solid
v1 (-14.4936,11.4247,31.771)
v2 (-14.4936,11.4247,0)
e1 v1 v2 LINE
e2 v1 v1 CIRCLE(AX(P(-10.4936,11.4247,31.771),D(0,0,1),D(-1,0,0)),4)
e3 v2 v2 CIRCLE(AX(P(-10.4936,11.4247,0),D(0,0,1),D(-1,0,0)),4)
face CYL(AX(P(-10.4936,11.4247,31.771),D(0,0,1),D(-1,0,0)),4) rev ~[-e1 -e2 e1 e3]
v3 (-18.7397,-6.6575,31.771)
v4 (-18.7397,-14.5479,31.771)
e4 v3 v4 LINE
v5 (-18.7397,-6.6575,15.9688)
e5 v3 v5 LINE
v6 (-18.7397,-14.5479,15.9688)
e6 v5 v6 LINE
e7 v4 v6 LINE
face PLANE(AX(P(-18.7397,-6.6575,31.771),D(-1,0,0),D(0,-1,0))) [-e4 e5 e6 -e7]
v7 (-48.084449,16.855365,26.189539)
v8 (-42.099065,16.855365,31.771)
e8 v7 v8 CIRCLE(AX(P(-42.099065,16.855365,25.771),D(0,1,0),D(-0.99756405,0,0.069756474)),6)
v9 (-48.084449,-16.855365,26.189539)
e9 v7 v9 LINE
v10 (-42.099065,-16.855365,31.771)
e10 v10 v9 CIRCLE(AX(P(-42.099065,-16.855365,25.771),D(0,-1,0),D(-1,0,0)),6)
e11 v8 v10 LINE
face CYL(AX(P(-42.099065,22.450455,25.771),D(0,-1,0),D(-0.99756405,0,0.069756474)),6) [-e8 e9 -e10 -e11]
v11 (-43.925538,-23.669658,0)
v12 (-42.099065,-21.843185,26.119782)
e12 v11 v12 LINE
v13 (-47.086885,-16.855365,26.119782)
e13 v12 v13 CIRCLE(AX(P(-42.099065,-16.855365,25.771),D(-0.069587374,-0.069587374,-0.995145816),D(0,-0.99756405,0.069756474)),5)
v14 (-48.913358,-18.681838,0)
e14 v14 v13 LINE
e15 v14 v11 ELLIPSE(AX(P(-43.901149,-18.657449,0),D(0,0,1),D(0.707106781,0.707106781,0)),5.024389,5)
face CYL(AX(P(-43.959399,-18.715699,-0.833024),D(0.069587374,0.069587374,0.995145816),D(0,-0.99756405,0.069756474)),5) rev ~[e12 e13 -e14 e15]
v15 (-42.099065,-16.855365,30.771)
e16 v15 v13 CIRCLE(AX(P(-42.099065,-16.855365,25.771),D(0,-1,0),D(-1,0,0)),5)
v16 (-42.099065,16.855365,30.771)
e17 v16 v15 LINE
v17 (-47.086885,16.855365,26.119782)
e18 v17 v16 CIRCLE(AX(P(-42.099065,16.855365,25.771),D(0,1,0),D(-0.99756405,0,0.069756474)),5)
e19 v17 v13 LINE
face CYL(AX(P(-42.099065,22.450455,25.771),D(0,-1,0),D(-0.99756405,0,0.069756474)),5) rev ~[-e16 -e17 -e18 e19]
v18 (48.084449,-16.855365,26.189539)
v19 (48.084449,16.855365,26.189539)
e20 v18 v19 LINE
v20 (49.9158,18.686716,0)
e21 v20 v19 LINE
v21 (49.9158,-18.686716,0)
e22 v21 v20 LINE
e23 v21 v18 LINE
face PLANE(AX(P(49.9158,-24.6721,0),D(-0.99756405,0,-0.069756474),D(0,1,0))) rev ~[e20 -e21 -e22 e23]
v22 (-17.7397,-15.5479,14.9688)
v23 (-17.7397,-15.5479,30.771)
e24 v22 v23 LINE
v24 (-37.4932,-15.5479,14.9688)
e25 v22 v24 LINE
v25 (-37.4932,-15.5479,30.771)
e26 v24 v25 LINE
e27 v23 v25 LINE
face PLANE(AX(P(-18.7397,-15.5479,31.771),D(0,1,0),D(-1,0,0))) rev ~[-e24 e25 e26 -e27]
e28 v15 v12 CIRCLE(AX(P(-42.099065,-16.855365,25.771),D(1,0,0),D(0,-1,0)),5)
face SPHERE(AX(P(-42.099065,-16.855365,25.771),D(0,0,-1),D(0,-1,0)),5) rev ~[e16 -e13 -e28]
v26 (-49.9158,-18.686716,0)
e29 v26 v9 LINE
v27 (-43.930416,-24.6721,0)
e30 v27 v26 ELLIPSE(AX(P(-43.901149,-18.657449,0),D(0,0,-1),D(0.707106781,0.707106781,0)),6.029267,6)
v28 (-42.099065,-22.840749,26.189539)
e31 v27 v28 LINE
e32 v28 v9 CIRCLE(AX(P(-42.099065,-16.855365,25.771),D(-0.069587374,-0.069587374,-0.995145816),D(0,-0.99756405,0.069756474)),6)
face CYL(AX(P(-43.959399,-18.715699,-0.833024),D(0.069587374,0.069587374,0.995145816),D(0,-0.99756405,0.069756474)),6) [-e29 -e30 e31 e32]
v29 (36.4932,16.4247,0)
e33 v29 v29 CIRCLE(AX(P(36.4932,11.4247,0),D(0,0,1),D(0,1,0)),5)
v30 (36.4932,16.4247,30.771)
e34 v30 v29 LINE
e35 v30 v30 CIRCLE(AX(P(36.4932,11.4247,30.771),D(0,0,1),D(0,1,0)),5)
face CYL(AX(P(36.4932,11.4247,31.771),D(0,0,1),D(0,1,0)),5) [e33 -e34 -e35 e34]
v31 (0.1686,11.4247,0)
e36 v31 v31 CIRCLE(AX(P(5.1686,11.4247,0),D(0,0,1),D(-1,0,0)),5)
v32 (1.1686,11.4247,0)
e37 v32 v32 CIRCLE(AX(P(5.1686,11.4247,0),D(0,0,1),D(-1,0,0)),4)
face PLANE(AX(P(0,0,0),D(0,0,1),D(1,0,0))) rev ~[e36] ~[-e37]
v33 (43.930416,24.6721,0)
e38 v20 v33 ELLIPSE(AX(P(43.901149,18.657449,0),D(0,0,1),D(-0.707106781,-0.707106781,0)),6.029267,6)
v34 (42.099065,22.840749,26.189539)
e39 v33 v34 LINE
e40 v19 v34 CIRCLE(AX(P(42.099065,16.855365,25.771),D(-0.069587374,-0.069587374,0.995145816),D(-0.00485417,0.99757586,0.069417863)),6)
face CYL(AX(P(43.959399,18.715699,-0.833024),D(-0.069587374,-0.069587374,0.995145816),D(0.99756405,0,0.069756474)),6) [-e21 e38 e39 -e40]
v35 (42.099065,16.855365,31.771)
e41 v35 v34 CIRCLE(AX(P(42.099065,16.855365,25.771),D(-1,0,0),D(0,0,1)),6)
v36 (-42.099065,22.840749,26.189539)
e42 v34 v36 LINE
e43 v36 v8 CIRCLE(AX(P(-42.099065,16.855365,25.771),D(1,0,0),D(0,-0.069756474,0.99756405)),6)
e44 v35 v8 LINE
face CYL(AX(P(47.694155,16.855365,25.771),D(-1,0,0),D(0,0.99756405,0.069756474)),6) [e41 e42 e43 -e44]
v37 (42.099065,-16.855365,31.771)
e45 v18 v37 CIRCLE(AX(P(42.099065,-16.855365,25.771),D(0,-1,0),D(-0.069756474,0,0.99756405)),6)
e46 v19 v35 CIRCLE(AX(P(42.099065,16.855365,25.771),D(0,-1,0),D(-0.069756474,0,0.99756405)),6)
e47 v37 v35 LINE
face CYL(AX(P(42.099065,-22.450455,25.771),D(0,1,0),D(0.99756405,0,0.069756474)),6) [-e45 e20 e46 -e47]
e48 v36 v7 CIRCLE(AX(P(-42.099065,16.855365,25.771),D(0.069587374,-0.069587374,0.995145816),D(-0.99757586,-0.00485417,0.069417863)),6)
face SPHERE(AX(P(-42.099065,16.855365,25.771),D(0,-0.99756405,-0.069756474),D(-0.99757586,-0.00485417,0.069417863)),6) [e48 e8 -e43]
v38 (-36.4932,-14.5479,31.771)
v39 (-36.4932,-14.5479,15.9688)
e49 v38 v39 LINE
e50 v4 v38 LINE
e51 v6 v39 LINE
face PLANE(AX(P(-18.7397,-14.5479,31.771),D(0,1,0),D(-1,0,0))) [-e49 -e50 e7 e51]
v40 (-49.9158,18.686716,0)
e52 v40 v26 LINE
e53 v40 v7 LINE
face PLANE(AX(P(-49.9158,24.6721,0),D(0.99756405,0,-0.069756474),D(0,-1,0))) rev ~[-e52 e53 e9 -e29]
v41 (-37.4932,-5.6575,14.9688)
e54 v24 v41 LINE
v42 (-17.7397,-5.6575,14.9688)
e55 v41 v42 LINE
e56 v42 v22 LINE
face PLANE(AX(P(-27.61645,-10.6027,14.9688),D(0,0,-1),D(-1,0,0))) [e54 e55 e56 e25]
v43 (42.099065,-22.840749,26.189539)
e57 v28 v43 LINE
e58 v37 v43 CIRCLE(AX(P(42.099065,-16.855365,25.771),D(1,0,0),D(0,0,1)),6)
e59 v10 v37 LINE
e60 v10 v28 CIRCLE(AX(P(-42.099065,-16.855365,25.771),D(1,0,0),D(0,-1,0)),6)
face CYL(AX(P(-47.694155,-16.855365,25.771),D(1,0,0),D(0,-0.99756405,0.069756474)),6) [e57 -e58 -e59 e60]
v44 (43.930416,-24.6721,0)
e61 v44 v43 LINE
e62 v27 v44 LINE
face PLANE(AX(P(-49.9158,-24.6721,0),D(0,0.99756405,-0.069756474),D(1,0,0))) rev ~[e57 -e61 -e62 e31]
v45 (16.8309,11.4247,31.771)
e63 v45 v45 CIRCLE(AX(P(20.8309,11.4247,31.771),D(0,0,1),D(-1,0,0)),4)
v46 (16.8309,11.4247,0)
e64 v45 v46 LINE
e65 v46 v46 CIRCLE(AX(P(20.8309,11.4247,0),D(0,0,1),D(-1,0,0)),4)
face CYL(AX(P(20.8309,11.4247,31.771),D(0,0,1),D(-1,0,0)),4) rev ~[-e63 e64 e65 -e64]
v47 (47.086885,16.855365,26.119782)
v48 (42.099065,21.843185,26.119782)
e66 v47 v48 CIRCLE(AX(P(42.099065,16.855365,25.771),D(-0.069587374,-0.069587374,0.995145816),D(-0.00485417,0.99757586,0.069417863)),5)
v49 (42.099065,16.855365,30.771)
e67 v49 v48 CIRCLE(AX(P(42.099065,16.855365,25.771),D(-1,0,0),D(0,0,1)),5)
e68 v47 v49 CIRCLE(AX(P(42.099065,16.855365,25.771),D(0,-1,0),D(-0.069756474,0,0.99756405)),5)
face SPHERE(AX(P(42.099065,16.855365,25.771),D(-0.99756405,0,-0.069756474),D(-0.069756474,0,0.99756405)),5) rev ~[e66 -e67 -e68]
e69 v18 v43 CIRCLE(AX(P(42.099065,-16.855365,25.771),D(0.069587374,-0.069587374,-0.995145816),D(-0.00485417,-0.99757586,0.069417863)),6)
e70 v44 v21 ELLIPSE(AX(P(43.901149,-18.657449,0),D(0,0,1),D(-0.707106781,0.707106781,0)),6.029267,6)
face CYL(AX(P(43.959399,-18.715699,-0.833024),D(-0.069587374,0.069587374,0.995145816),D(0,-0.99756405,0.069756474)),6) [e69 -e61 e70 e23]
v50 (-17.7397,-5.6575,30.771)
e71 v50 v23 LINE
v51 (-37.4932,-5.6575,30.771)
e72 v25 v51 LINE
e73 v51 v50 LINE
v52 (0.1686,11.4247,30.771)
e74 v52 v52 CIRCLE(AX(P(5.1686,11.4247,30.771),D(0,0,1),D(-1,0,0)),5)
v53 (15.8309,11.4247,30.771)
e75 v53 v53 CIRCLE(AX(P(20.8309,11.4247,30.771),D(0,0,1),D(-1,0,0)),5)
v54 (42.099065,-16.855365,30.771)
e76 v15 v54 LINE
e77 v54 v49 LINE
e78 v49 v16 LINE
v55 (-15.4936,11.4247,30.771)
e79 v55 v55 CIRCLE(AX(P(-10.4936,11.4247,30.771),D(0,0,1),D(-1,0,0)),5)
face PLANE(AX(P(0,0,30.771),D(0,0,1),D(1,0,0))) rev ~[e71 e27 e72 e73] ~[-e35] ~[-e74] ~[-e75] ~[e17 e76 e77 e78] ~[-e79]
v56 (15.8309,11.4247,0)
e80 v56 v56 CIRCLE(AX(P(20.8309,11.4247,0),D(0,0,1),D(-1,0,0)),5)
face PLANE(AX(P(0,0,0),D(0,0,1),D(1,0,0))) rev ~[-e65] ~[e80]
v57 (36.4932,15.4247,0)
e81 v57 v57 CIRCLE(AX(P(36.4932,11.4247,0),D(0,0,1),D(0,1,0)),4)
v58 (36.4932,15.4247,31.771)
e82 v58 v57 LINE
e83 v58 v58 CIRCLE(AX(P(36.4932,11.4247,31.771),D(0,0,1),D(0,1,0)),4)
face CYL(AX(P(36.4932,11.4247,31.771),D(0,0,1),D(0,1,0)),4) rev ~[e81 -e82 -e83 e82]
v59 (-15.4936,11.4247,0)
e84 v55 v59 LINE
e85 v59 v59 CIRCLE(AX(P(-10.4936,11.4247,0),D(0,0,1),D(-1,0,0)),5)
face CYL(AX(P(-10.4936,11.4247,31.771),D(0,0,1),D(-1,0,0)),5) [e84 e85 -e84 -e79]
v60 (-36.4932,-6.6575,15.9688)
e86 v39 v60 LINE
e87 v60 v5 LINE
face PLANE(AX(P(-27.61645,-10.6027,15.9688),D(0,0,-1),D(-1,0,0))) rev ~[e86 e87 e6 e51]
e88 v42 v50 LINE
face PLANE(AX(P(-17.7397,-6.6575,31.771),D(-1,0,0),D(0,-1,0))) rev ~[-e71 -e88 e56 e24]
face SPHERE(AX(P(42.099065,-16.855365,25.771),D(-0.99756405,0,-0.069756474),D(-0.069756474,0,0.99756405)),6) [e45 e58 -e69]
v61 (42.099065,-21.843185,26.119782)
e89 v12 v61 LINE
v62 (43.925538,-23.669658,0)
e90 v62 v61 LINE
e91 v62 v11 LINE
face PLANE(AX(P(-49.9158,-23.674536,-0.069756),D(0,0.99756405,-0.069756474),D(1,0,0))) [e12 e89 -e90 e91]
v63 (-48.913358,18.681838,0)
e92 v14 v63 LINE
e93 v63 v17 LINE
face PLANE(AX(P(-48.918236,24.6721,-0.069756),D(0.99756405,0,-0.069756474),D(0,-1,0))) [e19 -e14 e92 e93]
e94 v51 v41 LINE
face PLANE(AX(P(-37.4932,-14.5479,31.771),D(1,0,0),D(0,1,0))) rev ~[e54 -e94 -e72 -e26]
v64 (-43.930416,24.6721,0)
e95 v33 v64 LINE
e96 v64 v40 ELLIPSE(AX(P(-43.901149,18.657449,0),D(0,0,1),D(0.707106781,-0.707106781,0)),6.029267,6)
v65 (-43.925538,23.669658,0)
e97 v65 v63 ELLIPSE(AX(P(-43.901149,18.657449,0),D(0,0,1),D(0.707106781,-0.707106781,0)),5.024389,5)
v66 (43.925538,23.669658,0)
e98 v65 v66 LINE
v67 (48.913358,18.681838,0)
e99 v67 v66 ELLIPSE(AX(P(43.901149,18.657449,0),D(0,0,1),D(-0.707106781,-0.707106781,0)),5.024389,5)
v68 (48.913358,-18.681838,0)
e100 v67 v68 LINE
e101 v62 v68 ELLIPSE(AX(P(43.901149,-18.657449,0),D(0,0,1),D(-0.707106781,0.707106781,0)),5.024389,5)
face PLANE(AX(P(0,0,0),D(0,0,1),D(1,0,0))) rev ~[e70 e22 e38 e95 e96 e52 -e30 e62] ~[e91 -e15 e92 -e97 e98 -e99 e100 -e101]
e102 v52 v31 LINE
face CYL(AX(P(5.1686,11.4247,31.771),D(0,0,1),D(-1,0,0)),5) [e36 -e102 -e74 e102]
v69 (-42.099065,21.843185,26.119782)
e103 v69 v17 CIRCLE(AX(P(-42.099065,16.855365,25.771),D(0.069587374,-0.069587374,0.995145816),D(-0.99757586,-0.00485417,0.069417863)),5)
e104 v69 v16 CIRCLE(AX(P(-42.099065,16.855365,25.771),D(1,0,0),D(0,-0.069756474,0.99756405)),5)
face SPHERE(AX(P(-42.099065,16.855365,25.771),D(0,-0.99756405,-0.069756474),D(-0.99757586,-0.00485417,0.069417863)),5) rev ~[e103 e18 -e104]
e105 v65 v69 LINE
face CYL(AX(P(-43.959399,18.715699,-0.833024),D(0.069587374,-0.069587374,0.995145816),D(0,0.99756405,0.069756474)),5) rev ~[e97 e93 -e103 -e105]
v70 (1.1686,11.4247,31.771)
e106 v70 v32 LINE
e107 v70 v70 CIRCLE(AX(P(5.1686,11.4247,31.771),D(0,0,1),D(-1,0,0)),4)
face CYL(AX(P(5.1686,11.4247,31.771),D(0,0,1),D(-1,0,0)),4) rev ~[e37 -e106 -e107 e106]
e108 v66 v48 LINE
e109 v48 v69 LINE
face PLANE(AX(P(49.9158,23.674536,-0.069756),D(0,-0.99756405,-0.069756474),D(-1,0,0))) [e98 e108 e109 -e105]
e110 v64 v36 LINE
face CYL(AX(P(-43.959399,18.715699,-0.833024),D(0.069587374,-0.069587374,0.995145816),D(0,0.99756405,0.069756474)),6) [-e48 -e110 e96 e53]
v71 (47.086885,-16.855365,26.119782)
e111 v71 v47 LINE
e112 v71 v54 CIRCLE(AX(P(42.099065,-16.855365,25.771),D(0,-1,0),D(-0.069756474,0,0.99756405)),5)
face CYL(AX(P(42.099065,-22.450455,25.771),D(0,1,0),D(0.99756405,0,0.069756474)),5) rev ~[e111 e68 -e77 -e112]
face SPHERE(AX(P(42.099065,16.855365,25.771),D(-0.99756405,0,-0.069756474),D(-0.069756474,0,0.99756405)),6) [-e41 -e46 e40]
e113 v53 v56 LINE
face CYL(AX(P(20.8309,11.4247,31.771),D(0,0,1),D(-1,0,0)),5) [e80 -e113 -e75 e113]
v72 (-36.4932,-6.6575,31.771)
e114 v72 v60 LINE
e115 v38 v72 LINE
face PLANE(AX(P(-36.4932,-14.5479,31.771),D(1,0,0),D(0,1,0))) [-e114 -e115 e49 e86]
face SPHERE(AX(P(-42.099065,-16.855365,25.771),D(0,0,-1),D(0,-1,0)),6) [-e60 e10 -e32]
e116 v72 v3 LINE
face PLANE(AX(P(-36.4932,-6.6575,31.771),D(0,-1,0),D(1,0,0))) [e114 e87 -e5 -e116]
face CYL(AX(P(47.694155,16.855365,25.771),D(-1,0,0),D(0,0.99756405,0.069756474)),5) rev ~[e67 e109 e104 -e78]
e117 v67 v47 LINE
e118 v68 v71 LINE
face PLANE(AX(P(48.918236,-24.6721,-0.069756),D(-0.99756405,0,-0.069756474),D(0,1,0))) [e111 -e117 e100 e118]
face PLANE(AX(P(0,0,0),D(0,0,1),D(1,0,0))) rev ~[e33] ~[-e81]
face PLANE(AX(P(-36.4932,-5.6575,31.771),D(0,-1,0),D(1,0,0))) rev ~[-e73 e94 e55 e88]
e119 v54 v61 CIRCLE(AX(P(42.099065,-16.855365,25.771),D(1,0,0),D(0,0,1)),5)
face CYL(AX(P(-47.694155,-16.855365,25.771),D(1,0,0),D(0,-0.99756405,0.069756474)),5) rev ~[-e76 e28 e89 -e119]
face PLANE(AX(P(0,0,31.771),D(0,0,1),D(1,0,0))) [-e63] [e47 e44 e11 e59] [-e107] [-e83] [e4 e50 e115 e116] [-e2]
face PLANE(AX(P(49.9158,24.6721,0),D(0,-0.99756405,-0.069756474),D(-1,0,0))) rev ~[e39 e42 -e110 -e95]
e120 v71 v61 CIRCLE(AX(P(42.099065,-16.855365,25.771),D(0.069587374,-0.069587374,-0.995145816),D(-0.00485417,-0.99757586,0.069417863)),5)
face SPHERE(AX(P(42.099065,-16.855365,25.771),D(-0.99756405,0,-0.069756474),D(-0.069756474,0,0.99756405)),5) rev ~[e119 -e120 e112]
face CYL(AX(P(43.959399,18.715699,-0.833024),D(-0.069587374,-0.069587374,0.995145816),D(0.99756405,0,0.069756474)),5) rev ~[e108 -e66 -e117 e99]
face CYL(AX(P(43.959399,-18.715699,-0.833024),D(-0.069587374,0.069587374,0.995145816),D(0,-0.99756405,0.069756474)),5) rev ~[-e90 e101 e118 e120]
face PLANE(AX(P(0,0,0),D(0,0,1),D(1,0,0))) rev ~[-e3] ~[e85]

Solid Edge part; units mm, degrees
sketch "Sketch1" plane through (0, 0, 0) normal (0, 0, 1) x (1, 0, 0)
  line L0 (-49.9158, -24.6721) -> (49.9158, -24.6721)
  line L1 (49.9158, -24.6721) -> (49.9158, 24.6721)
  line L2 (49.9158, 24.6721) -> (-49.9158, 24.6721)
  line L3 (-49.9158, 24.6721) -> (-49.9158, -24.6721)
extrude "Protrusion1" add sketch "Sketch1" along normal blind 31.771
draft "Draft_1" angle 4 neutral plane through (0, 0, 0) normal (0, 0, 1) pull direction (0, 0, 1) face at (49.9158, -16.9415, 26.1581) face at (34.2755, 24.6721, 26.1581) face at (-49.9158, 16.9415, 26.1581) face at (-34.2755, -24.6721, 26.1581)
fillet "Round_1" radius 6 8 edges at (-48.8049, -23.5613, 15.8855) (0, -22.4505, 31.771) (-47.6941, 0, 31.771) (-48.8049, 23.5613, 15.8855) (0, 22.4505, 31.771) (47.6941, 0, 31.771) (48.8049, -23.5613, 15.8855) (48.8049, 23.5613, 15.8855)
sketch "Sketch2" plane through (0, 0, 31.771) normal (0, 0, 1) x (0, 1, 0)
  circle A0 centre (11.4247, -36.4932) radius 4
extrude "ExtrudedCutout_1" cut sketch "Sketch2" against normal blind 65.3593
sketch "Sketch3" plane through (20.8309, 11.4247, 31.771) normal (0, 0, 1) x (-1, 0, 0)
  circle A0 centre (0, 0) radius 4
  circle A1 centre (15.6623, 0) radius 4
  circle A2 centre (31.3245, 0) radius 4
extrude "ExtrudedCutout_2" cut sketch "Sketch3" against normal blind 66.2854
sketch "Sketch4" plane through (0, 0, 31.771) normal (0, 0, 1) x (0, 1, 0)
  line L0 (-6.6575, 36.4932) -> (-6.6575, 18.7397)
  line L1 (-6.6575, 18.7397) -> (-14.5479, 18.7397)
  line L2 (-14.5479, 18.7397) -> (-14.5479, 36.4932)
  line L3 (-14.5479, 36.4932) -> (-6.6575, 36.4932)
extrude "ExtrudedCutout_3" cut sketch "Sketch4" against normal blind 15.8022
shell "Thin_Wall_1" thickness 1 removed faces 1 at (-34.2755, -15.9546, 0)
